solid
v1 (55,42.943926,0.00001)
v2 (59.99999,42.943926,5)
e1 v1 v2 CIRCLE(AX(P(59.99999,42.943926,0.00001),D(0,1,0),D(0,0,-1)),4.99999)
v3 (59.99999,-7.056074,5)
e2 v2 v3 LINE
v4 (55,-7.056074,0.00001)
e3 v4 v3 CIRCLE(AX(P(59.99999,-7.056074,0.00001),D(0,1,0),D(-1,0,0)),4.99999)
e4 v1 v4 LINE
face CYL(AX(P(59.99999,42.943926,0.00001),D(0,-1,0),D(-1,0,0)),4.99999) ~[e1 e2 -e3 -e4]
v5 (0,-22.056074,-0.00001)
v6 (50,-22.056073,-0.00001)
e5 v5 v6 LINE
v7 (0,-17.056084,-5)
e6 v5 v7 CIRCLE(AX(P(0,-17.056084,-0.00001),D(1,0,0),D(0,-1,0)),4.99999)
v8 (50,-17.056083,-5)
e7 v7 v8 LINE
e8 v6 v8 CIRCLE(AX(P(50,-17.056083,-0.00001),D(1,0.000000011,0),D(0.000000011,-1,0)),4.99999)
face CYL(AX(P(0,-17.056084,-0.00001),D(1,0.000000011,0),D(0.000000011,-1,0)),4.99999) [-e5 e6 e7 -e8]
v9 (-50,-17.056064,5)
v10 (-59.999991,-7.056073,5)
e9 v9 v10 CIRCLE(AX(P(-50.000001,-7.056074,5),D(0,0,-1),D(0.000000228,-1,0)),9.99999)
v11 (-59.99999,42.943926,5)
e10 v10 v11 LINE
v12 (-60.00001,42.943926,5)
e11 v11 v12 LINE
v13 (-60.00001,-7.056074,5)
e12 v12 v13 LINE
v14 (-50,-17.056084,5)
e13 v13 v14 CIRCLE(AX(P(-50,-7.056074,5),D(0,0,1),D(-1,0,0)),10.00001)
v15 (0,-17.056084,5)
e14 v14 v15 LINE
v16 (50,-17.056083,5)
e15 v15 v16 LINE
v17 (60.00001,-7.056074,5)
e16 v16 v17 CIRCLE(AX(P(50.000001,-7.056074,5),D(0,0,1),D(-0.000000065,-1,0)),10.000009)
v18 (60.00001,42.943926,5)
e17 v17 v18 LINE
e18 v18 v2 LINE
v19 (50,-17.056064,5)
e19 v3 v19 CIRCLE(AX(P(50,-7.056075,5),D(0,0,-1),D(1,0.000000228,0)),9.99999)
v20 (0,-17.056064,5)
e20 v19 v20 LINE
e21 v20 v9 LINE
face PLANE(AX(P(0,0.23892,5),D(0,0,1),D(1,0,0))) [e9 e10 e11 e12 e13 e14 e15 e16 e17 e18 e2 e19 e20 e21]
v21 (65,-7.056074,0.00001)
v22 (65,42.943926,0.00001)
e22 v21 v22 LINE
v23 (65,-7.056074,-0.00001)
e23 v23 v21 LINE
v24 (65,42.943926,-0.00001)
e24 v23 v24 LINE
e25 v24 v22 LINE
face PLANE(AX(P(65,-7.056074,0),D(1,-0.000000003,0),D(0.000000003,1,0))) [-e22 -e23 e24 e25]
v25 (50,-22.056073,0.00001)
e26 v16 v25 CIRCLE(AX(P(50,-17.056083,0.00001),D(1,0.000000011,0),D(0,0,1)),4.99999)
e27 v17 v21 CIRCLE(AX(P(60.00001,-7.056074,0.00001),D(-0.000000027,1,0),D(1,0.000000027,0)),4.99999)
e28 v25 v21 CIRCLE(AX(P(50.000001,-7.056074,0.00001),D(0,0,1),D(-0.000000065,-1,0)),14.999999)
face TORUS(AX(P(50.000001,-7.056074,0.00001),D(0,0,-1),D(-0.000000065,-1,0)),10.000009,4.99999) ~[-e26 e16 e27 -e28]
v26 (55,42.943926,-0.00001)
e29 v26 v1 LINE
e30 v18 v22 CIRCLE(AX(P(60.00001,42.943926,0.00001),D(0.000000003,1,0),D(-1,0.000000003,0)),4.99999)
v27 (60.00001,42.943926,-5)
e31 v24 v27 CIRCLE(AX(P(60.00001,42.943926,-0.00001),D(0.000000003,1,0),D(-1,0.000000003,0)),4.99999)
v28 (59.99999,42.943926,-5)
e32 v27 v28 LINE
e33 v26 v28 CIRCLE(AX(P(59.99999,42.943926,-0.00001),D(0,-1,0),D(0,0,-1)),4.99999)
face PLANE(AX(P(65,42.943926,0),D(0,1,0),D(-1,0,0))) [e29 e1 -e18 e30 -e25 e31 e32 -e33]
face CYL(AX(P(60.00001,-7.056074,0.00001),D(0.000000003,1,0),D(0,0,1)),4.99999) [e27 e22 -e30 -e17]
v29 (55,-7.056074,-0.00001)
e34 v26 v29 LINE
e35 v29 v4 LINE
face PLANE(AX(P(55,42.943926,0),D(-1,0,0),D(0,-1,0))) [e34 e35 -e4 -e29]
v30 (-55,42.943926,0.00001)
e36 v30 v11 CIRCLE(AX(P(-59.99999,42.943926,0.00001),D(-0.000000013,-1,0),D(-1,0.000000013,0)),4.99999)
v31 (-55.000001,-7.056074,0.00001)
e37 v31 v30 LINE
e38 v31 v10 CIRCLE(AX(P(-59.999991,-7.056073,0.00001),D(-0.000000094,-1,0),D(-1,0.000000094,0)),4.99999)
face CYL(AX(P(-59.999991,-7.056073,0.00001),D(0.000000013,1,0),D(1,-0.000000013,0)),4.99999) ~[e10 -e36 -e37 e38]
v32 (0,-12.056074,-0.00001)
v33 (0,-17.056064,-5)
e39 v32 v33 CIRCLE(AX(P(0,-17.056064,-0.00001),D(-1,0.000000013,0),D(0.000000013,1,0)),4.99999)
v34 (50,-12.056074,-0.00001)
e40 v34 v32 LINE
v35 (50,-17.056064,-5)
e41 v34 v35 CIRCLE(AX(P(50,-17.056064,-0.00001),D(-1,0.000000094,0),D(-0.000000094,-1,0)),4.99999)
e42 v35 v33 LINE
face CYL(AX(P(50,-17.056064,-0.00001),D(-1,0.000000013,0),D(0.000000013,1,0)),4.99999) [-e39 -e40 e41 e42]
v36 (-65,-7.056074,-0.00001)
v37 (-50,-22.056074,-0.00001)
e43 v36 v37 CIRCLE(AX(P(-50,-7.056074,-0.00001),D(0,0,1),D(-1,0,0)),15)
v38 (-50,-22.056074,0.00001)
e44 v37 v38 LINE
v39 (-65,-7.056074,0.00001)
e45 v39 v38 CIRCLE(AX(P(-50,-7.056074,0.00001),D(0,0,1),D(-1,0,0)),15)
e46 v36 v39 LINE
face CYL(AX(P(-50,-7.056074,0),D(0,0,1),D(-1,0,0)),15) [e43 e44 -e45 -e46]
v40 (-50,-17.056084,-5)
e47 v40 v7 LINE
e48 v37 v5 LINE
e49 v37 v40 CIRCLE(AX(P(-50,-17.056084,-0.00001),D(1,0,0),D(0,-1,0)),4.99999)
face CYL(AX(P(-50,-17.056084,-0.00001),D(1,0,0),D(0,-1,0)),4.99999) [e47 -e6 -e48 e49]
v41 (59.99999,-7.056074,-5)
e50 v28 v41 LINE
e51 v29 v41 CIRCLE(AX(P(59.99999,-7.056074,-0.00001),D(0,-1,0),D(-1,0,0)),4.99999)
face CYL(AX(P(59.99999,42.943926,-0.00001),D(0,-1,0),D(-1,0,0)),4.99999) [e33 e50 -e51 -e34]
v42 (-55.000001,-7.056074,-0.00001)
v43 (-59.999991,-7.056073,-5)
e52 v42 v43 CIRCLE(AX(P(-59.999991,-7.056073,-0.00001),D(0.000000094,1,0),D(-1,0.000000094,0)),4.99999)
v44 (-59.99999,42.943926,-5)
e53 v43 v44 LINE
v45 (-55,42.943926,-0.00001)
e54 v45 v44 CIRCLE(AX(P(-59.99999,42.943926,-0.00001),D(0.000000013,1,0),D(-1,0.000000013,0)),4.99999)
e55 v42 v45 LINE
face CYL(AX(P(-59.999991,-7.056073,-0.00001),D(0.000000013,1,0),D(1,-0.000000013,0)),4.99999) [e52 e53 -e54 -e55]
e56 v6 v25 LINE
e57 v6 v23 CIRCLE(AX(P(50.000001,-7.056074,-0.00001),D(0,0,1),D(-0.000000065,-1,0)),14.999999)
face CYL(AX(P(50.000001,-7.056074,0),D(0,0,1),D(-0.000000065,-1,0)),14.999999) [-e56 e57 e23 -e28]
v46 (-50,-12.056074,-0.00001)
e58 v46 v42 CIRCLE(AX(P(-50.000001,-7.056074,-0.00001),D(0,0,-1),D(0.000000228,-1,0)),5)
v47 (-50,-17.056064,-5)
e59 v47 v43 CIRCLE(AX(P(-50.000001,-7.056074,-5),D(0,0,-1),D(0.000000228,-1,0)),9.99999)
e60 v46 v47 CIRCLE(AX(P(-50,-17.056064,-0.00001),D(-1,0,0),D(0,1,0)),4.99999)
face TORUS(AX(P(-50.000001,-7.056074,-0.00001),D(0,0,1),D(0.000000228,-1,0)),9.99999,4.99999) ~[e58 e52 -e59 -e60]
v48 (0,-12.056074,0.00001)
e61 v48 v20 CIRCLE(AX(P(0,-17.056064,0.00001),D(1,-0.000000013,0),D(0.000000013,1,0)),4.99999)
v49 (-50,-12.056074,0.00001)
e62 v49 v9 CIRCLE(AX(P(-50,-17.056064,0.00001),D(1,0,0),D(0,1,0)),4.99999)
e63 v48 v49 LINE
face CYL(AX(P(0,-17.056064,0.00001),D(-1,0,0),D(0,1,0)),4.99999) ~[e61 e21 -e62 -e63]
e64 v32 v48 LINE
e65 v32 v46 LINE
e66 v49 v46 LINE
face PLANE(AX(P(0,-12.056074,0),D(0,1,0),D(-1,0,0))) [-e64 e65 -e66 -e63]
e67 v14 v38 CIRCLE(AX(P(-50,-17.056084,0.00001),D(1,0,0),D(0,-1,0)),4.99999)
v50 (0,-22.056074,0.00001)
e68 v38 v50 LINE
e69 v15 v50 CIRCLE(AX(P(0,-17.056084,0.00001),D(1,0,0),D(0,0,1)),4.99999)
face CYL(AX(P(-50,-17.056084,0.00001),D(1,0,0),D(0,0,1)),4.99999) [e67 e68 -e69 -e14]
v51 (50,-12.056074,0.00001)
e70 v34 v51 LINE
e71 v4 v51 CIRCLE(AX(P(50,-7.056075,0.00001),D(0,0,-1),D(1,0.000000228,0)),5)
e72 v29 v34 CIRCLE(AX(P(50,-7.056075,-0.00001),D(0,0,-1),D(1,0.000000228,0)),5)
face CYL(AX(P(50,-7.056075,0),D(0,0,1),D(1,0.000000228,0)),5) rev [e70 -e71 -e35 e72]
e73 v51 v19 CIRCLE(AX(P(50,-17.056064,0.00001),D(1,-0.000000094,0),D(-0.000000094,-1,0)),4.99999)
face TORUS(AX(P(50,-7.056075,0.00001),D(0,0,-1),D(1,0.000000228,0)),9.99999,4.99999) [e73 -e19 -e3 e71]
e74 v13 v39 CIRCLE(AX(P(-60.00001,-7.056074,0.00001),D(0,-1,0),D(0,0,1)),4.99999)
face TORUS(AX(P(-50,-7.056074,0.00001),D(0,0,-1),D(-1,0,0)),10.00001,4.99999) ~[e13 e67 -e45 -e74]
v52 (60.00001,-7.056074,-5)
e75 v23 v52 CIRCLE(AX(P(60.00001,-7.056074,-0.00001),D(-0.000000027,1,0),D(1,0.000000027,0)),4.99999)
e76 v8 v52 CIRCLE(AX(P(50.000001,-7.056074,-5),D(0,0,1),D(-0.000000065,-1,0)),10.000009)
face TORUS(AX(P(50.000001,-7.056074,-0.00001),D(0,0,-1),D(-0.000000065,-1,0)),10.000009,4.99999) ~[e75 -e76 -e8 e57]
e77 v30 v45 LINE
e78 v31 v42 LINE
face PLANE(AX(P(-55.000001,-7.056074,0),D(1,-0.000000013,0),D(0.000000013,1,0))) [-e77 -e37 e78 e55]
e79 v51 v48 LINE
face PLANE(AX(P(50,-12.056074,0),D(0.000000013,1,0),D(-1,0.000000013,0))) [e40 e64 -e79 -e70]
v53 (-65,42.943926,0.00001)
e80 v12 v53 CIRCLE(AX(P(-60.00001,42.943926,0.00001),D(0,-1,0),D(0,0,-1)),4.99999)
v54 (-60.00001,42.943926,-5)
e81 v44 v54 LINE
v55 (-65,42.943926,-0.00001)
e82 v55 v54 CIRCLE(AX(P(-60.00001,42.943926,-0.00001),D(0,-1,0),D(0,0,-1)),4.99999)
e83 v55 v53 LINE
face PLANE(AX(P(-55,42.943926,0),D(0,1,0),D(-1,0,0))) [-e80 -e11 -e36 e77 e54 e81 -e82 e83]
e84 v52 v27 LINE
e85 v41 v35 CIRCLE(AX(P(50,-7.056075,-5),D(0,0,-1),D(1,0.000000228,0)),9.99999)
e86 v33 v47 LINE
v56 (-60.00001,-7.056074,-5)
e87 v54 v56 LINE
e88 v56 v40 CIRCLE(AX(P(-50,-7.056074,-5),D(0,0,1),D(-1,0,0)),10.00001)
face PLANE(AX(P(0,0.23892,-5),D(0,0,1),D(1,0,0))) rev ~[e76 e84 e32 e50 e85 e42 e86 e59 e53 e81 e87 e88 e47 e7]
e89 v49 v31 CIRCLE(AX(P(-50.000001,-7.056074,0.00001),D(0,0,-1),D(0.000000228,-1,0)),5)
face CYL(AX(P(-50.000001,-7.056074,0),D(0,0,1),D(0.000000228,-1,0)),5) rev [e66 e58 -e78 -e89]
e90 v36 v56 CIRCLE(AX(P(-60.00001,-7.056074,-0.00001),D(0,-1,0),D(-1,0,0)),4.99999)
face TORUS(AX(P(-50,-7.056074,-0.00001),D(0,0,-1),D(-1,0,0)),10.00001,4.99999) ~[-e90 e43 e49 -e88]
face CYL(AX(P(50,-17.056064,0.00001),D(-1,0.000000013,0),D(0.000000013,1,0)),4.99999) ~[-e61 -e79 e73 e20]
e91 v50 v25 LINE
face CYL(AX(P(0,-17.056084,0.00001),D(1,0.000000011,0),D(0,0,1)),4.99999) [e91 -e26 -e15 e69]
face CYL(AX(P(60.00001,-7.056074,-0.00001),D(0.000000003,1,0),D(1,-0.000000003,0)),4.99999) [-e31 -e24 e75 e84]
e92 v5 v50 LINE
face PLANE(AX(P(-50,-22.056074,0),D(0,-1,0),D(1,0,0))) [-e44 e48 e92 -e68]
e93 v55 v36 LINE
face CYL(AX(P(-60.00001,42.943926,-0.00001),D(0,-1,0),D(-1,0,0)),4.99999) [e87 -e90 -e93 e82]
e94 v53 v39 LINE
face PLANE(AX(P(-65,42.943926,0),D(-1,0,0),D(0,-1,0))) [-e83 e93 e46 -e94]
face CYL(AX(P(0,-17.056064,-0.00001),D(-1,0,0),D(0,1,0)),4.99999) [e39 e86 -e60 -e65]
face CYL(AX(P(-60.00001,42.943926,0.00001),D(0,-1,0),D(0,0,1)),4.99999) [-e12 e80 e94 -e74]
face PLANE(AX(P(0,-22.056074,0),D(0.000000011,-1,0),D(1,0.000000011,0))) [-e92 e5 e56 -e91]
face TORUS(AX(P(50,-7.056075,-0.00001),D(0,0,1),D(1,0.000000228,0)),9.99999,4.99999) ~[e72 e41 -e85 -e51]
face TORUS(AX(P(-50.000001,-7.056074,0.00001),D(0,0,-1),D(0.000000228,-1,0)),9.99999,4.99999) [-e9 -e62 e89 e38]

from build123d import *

# Parameters (mm, degrees)
F1_DEPTH = 5
F2_R     = 4.99999


# Not quite as in the source:
# - a fillet or chamfer is up to 0.001 mm smaller than in the source, because OpenCascade refuses the exact size
# - ends of sketch curves that miss each other by under 0.0002 mm in the source are joined


with BuildPart() as f1:
    # F0 (on Top) → F1 (new body, symmetric)
    with BuildSketch(Plane.XY):
        with BuildLine():
            Line((-55, 42.9439264748), (-65, 42.9439264748))
            Line((-65, 42.9439264748), (-65, -7.0560735252))
            ThreePointArc((-65, -7.0560735252), (-60.6066017178, -17.662675243), (-50, -22.0560735252))
            Line((-50, -22.0560735252), (0, -22.0560735252))
            Line((0, -22.0560735252), (50, -22.0560729504))
            ThreePointArc((50, -22.0560729504), (60.6066017178, -17.662675243), (65, -7.0560735252))
            Line((65, -7.0560735252), (65.000000149, 42.9439264748))
            Line((65.000000149, 42.9439264748), (55, 42.9439264748))
            Line((55, 42.9439264748), (55, -7.0560735252))
            ThreePointArc((55, -7.0560735252), (53.5355343776, -10.5916079028), (50, -12.0560741922))
            Line((50, -12.0560741922), (0, -12.0560735252))
            Line((0, -12.0560735252), (-50, -12.0560735252))
            ThreePointArc((-50, -12.0560735252), (-53.5355343776, -10.5916079028), (-55.000000667, -7.0560735252))
            Line((-55.000000667, -7.0560735252), (-55, 42.9439264748))
        make_face()
    extrude(amount=F1_DEPTH, both=True)

    # F2 (radius 5 in the source; OpenCascade refuses exactly that, so slightly less here)
    f2_edges = [f1.edges().sort_by_distance(p)[0] for p in [
        (-65, 17.943926, 5),
        (-65, -7.056074, 0),
        (-60.606602, -17.662675, -5),
        (-50, -22.056074, 0),
        (-60.606602, -17.662675, 5),
        (-25, -22.056074, -5),
        (0, -22.056074, 0),
        (-25, -22.056074, 5),
        (50, -22.056073, 0),
        (60.606602, -17.662675, -5),
        (65, -7.056074, 0),
        (60.606602, -17.662675, 5),
        (55, -7.056074, 0),
        (53.535534, -10.591608, -5),
        (50, -12.056074, 0),
        (53.535534, -10.591608, 5),
        (-25, -12.056074, -5),
        (-50, -12.056074, 0),
        (-25, -12.056074, 5),
        (0, -12.056074, 0),
        (-53.535534, -10.591608, -5),
        (-55.000001, -7.056074, 0),
        (-53.535534, -10.591608, 5),
    ]]
    fillet(f2_edges, radius=F2_R)


solid = f1.part
